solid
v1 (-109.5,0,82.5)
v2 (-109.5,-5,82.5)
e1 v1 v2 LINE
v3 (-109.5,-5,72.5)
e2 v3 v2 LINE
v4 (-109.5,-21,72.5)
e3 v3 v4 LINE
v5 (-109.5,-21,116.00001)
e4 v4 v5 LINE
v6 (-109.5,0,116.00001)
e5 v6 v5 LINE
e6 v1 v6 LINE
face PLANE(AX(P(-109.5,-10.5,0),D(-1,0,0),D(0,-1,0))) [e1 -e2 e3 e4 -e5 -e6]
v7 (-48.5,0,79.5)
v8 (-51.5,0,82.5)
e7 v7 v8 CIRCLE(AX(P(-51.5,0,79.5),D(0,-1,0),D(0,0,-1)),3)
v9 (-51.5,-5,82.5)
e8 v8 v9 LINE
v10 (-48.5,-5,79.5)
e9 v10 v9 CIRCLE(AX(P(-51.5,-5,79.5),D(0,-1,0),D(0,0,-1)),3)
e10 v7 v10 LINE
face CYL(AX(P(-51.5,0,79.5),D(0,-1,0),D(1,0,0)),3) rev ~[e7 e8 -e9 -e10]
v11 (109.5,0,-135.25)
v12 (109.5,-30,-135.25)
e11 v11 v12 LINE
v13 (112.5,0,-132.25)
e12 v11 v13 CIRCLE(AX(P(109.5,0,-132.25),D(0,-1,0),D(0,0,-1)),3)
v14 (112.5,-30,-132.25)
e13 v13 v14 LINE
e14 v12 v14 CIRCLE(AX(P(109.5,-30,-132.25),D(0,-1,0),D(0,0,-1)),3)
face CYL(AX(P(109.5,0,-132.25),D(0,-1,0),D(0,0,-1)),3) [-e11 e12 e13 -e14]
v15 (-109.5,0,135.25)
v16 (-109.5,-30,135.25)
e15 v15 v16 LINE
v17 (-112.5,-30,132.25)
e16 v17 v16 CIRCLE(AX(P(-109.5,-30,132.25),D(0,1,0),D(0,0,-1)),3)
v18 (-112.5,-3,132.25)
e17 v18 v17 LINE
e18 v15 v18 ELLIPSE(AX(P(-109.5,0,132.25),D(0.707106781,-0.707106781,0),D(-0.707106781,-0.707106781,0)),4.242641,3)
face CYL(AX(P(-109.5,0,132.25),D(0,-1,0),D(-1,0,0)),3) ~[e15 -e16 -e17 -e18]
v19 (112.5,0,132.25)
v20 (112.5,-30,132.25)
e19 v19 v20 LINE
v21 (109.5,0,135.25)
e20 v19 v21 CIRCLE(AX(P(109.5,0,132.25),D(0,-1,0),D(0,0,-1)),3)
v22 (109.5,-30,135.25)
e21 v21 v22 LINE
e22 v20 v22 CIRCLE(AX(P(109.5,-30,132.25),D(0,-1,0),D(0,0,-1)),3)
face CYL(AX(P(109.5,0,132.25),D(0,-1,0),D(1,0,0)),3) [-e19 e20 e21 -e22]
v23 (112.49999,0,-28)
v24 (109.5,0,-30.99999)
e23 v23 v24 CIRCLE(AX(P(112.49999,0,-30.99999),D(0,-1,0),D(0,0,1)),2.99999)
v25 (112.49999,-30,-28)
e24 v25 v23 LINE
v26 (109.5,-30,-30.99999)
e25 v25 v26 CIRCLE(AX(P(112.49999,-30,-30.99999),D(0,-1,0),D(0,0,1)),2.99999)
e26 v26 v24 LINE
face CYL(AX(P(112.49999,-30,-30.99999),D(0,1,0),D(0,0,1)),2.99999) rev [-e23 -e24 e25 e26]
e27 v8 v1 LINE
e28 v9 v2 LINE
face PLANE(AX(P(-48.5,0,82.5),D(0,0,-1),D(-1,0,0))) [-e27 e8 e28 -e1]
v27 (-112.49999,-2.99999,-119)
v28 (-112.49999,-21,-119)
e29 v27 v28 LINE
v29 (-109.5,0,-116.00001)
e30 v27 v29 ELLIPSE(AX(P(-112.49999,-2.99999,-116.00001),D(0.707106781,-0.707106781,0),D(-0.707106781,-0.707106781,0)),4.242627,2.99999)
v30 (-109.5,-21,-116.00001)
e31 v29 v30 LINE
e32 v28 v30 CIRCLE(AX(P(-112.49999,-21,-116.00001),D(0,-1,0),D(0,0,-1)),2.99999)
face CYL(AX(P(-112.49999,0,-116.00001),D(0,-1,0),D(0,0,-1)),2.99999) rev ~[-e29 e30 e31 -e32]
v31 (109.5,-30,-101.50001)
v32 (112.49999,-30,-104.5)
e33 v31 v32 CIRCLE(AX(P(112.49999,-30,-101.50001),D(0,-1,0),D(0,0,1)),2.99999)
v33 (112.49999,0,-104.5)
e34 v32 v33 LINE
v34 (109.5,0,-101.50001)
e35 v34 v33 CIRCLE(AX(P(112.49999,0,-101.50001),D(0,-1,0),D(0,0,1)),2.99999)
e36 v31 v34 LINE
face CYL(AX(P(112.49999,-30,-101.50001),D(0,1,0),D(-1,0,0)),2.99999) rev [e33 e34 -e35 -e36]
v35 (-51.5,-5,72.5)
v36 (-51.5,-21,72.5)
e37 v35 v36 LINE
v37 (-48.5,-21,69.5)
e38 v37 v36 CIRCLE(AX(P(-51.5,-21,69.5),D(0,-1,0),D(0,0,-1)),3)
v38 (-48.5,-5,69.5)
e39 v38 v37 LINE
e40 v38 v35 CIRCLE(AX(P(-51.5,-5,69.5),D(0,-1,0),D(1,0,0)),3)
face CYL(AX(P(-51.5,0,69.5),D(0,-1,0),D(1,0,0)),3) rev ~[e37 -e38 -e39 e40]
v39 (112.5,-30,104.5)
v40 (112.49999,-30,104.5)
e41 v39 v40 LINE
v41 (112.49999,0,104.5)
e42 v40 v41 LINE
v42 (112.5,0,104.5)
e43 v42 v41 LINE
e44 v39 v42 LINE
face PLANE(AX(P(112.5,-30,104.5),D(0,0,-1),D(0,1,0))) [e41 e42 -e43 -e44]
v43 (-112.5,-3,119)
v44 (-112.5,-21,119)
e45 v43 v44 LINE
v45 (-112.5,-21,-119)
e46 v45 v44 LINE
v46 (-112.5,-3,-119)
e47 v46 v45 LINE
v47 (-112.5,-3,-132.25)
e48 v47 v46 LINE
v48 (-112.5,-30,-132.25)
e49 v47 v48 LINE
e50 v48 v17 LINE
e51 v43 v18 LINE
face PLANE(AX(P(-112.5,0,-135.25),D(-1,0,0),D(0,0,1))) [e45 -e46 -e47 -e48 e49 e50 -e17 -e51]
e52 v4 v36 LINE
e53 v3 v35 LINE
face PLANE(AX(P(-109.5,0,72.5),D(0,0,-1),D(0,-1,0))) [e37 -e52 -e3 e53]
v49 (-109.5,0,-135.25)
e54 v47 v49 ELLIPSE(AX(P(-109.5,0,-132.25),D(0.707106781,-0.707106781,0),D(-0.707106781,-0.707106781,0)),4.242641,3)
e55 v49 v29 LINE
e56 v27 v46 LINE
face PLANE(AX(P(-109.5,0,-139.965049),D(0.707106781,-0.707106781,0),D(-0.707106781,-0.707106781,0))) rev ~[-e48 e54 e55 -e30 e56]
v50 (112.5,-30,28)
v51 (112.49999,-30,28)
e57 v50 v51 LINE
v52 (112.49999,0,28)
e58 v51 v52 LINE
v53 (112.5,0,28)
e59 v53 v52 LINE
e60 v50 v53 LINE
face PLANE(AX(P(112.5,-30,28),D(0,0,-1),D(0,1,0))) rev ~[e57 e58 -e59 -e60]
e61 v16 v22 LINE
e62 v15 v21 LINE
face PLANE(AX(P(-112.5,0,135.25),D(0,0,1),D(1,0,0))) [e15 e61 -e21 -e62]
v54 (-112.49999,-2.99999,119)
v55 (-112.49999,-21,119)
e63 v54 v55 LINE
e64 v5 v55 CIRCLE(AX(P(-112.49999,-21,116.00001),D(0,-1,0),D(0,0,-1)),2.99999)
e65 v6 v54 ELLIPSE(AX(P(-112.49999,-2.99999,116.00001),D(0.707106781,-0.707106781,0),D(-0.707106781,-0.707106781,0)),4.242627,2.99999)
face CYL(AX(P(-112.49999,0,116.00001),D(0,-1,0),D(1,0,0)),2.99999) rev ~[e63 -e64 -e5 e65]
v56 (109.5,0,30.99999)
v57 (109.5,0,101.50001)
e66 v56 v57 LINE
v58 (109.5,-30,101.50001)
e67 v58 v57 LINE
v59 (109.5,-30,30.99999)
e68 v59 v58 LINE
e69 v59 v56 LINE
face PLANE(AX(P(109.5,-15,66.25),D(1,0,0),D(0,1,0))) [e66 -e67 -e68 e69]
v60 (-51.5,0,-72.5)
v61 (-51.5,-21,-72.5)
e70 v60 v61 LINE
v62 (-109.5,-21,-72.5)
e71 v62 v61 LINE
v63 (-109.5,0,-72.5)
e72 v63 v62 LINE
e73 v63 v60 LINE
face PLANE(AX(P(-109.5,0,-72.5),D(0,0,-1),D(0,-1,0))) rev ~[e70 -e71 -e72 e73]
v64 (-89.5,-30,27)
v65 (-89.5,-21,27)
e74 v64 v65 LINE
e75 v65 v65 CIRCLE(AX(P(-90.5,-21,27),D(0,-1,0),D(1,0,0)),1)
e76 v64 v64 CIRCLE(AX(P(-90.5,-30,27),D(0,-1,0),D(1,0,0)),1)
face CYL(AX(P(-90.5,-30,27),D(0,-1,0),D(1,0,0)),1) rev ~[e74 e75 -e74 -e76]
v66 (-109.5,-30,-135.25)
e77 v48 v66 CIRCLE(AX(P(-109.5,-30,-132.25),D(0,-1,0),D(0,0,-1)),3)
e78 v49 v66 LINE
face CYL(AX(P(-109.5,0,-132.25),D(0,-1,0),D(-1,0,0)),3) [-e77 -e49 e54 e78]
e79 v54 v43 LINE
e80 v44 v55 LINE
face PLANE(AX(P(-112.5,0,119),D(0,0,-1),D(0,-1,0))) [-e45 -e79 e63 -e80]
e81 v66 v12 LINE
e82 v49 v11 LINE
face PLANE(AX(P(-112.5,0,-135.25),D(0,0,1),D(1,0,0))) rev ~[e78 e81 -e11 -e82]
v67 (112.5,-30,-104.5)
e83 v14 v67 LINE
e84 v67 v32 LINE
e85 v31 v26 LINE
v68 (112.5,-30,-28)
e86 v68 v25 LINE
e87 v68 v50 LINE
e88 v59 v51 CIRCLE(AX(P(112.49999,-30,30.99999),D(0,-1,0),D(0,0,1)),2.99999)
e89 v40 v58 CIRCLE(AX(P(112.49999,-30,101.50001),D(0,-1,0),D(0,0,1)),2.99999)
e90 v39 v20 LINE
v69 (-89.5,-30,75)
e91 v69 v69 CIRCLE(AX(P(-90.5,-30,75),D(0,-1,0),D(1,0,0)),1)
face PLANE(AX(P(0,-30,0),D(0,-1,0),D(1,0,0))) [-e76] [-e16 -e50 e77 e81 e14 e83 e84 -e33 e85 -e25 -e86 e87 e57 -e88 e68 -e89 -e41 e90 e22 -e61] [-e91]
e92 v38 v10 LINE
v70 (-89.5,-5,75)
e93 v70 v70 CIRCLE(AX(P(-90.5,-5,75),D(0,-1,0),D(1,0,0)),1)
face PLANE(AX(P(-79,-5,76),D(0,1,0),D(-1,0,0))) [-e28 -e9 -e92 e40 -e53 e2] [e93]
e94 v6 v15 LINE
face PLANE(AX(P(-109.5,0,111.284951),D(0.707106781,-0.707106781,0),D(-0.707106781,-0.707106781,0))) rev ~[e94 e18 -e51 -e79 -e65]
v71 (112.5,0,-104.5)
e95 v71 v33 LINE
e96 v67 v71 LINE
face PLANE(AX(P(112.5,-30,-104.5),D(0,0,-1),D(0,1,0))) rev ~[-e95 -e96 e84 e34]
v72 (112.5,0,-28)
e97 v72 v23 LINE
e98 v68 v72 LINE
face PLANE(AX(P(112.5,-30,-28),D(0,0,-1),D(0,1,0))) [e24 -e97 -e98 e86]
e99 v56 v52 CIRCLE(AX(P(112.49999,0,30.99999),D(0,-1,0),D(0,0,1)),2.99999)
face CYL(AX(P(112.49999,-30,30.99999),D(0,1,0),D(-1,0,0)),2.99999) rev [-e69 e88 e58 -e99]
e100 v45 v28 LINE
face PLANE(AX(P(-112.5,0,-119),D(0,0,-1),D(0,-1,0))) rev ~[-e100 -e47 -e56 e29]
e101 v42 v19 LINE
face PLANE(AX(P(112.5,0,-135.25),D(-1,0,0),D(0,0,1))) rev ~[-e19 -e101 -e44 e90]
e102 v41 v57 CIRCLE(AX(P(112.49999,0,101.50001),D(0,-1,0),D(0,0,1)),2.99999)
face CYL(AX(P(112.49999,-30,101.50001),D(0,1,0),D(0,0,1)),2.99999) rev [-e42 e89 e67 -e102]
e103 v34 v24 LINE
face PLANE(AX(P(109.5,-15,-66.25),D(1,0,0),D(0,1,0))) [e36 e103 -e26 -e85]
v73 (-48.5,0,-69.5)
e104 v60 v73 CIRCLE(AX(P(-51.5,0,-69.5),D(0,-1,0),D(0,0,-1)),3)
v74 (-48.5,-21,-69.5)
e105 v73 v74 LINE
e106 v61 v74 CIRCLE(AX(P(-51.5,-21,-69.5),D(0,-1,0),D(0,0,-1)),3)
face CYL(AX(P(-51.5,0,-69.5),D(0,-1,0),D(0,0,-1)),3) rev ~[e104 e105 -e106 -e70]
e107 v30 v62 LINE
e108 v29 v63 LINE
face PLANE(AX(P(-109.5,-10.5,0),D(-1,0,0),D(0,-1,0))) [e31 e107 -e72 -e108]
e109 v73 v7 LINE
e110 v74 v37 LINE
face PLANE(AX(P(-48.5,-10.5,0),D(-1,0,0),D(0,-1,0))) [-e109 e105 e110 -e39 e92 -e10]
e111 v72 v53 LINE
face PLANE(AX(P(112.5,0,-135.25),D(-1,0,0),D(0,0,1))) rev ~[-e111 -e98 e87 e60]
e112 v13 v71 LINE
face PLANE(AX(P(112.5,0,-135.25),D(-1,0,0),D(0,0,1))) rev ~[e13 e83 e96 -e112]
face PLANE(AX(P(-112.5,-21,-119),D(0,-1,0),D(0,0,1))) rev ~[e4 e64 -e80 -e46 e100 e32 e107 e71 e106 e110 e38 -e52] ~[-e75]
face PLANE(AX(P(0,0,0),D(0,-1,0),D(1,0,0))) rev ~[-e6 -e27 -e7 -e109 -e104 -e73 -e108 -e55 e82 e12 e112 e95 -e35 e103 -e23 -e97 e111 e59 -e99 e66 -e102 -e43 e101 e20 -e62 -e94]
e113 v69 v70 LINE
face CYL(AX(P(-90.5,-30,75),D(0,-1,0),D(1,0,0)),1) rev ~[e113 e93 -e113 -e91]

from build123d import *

# Parameters (mm, degrees)
F0_W          = 225
F0_H          = 270.5
F1_DEPTH      = 30
F2_R          = 3
F3_W          = 30
F3_H          = 76.5
F4_DEPTH      = 3
F5_R          = 2.99999
F6_W          = 21
F6_H          = 238
F7_DEPTH      = 3
F8_R          = 2.99999
F9_W          = 21
F9_H          = 145
F10_DEPTH     = 61
F11_R         = 3
F12_T1_DEPTH  = 28.6800979278
F12_T3_DEPTH  = 28.6800979278
F12_T8_DEPTH  = 15.4301079278
F12_T13_DEPTH = 15.4301079278
F13_W         = 61
F13_H         = 13
F14_DEPTH     = 5
F15_R         = 3
F16_R         = 1
F17_DEPTH     = 25


# Not quite as in the source:
# - a fillet or chamfer that OpenCascade refuses, or shapes differently, is made with other operations: its cross-section is extruded or revolved along the edge and cut away or added
# - a fillet or chamfer is up to 0.001 mm smaller than in the source, because OpenCascade refuses the exact size


with BuildPart() as f1:
    # F0 (on Front) → F1 (new body)
    with BuildSketch(Plane.XZ):
        Rectangle(F0_W, F0_H)
    extrude(amount=F1_DEPTH)

    # F2
    f2_edges = [f1.edges().sort_by_distance(p)[0] for p in [
        (112.5, -15, 135.25),
        (112.5, -15, -135.25),
        (-112.5, -15, 135.25),
        (-112.5, -15, -135.25),
    ]]
    fillet(f2_edges, radius=F2_R)

    # F3 (on face) → F4 (cut)
    with BuildSketch(Plane.YZ.offset(112.5)):
        with Locations((-15, 66.25)):
            Rectangle(F3_W, F3_H)
        with Locations((-15, -66.25)):
            Rectangle(F3_W, F3_H)
    extrude(amount=-F4_DEPTH, mode=Mode.SUBTRACT)

    # F5 (radius 3 in the source; OpenCascade refuses exactly that, so slightly less here)
    f5_edges = [f1.edges().sort_by_distance(p)[0] for p in [
        (109.5, -15, 28),
        (109.5, -15, -104.5),
        (109.5, -15, -28),
        (109.5, -15, 104.5),
    ]]
    fillet(f5_edges, radius=F5_R)

    # F6 (on face) → F7 (cut)
    with BuildSketch(Plane(origin=(-112.5, 0, 0), x_dir=(0, -1, 0), z_dir=(-1, 0, 0))):
        with Locations((10.5, 0)):
            Rectangle(F6_W, F6_H)
    extrude(amount=-F7_DEPTH, mode=Mode.SUBTRACT)

    # F8 (radius 3 in the source; OpenCascade refuses exactly that, so slightly less here)
    f8_edges = [f1.edges().sort_by_distance(p)[0] for p in [
        (-109.5, -10.5, -119),
        (-109.5, -10.5, 119),
    ]]
    fillet(f8_edges, radius=F8_R)

    # F9 (on face) → F10 (cut)
    with BuildSketch(Plane(origin=(-109.5, 0, 0), x_dir=(0, -1, 0), z_dir=(-1, 0, 0))):
        with Locations((10.5, 0)):
            Rectangle(F9_W, F9_H)
    extrude(amount=-F10_DEPTH, mode=Mode.SUBTRACT)

    # F11
    f11_edges = [f1.edges().sort_by_distance(p)[0] for p in [
        (-48.5, -10.5, -72.5),
        (-48.5, -10.5, 72.5),
    ]]
    fillet(f11_edges, radius=F11_R)

    # F12: chamfer of 3 on 6 edges, made by hand

    # F12_s2 → F12_t1 (cut)
    with BuildSketch(Plane.XY.offset(-139.9650489639)):
        Polygon((-109.5, 0), (-112.5, -3), (-112.5, 0), align=None)
    extrude(amount=F12_T1_DEPTH, mode=Mode.SUBTRACT)

    # F12_s4 → F12_t3 (cut)
    with BuildSketch(Plane.XY.offset(111.2849510361)):
        Polygon((-109.5, 0), (-112.5, -3), (-112.5, 0), align=None)
    extrude(amount=F12_T3_DEPTH, mode=Mode.SUBTRACT)


with BuildPart() as f12_tool6:
    # F12_s7 → F12_t8 (new body)
    with BuildSketch(Plane.YZ.offset(-120.2150489639)):
        Polygon((0, -122), (-3, -119), (0, -119), align=None)
    extrude(amount=F12_T8_DEPTH)

    split(bisect_by=Plane(origin=(-54.75, 54.75, 0), x_dir=(0, 0, 1), z_dir=(-0.7071067812, 0.7071067812, 0)), keep=Keep.TOP)


with BuildPart() as f1_1:
    add(f1.part)

    # F12_t5: cut F12_tool6
    add(f12_tool6.part, mode=Mode.SUBTRACT)


with BuildPart() as f12_tool11:
    # F12_s12 → F12_t13 (new body)
    with BuildSketch(Plane.YZ.offset(-120.2150489639)):
        Polygon((0, 122), (-3, 119), (0, 119), align=None)
    extrude(amount=F12_T13_DEPTH)

    split(bisect_by=Plane(origin=(-54.75, 54.75, 0), x_dir=(0, 0, 1), z_dir=(-0.7071067812, 0.7071067812, 0)), keep=Keep.TOP)


with BuildPart() as f1_2:
    add(f1_1.part)

    # F12_t10: cut F12_tool11
    add(f12_tool11.part, mode=Mode.SUBTRACT)

    # F13 (on face) → F14 (cut)
    with BuildSketch(Plane(origin=(0, 0, 0), x_dir=(-1, 0, 0), z_dir=(0, 1, 0))):
        with Locations((79, 76)):
            Rectangle(F13_W, F13_H)
    extrude(amount=-F14_DEPTH, mode=Mode.SUBTRACT)

    # F15
    f15_edges = [f1_2.edges().sort_by_distance(p)[0] for p in [
        (-48.5, -2.5, 82.5),
    ]]
    fillet(f15_edges, radius=F15_R)

    # F16 (on face) → F17 (cut)
    with BuildSketch(Plane.XZ.offset(30)):
        with Locations((-90.5, 75)):
            Circle(F16_R)
        with Locations((-90.5, 27)):
            Circle(F16_R)
    extrude(amount=-F17_DEPTH, mode=Mode.SUBTRACT)


solid = f1_2.part
